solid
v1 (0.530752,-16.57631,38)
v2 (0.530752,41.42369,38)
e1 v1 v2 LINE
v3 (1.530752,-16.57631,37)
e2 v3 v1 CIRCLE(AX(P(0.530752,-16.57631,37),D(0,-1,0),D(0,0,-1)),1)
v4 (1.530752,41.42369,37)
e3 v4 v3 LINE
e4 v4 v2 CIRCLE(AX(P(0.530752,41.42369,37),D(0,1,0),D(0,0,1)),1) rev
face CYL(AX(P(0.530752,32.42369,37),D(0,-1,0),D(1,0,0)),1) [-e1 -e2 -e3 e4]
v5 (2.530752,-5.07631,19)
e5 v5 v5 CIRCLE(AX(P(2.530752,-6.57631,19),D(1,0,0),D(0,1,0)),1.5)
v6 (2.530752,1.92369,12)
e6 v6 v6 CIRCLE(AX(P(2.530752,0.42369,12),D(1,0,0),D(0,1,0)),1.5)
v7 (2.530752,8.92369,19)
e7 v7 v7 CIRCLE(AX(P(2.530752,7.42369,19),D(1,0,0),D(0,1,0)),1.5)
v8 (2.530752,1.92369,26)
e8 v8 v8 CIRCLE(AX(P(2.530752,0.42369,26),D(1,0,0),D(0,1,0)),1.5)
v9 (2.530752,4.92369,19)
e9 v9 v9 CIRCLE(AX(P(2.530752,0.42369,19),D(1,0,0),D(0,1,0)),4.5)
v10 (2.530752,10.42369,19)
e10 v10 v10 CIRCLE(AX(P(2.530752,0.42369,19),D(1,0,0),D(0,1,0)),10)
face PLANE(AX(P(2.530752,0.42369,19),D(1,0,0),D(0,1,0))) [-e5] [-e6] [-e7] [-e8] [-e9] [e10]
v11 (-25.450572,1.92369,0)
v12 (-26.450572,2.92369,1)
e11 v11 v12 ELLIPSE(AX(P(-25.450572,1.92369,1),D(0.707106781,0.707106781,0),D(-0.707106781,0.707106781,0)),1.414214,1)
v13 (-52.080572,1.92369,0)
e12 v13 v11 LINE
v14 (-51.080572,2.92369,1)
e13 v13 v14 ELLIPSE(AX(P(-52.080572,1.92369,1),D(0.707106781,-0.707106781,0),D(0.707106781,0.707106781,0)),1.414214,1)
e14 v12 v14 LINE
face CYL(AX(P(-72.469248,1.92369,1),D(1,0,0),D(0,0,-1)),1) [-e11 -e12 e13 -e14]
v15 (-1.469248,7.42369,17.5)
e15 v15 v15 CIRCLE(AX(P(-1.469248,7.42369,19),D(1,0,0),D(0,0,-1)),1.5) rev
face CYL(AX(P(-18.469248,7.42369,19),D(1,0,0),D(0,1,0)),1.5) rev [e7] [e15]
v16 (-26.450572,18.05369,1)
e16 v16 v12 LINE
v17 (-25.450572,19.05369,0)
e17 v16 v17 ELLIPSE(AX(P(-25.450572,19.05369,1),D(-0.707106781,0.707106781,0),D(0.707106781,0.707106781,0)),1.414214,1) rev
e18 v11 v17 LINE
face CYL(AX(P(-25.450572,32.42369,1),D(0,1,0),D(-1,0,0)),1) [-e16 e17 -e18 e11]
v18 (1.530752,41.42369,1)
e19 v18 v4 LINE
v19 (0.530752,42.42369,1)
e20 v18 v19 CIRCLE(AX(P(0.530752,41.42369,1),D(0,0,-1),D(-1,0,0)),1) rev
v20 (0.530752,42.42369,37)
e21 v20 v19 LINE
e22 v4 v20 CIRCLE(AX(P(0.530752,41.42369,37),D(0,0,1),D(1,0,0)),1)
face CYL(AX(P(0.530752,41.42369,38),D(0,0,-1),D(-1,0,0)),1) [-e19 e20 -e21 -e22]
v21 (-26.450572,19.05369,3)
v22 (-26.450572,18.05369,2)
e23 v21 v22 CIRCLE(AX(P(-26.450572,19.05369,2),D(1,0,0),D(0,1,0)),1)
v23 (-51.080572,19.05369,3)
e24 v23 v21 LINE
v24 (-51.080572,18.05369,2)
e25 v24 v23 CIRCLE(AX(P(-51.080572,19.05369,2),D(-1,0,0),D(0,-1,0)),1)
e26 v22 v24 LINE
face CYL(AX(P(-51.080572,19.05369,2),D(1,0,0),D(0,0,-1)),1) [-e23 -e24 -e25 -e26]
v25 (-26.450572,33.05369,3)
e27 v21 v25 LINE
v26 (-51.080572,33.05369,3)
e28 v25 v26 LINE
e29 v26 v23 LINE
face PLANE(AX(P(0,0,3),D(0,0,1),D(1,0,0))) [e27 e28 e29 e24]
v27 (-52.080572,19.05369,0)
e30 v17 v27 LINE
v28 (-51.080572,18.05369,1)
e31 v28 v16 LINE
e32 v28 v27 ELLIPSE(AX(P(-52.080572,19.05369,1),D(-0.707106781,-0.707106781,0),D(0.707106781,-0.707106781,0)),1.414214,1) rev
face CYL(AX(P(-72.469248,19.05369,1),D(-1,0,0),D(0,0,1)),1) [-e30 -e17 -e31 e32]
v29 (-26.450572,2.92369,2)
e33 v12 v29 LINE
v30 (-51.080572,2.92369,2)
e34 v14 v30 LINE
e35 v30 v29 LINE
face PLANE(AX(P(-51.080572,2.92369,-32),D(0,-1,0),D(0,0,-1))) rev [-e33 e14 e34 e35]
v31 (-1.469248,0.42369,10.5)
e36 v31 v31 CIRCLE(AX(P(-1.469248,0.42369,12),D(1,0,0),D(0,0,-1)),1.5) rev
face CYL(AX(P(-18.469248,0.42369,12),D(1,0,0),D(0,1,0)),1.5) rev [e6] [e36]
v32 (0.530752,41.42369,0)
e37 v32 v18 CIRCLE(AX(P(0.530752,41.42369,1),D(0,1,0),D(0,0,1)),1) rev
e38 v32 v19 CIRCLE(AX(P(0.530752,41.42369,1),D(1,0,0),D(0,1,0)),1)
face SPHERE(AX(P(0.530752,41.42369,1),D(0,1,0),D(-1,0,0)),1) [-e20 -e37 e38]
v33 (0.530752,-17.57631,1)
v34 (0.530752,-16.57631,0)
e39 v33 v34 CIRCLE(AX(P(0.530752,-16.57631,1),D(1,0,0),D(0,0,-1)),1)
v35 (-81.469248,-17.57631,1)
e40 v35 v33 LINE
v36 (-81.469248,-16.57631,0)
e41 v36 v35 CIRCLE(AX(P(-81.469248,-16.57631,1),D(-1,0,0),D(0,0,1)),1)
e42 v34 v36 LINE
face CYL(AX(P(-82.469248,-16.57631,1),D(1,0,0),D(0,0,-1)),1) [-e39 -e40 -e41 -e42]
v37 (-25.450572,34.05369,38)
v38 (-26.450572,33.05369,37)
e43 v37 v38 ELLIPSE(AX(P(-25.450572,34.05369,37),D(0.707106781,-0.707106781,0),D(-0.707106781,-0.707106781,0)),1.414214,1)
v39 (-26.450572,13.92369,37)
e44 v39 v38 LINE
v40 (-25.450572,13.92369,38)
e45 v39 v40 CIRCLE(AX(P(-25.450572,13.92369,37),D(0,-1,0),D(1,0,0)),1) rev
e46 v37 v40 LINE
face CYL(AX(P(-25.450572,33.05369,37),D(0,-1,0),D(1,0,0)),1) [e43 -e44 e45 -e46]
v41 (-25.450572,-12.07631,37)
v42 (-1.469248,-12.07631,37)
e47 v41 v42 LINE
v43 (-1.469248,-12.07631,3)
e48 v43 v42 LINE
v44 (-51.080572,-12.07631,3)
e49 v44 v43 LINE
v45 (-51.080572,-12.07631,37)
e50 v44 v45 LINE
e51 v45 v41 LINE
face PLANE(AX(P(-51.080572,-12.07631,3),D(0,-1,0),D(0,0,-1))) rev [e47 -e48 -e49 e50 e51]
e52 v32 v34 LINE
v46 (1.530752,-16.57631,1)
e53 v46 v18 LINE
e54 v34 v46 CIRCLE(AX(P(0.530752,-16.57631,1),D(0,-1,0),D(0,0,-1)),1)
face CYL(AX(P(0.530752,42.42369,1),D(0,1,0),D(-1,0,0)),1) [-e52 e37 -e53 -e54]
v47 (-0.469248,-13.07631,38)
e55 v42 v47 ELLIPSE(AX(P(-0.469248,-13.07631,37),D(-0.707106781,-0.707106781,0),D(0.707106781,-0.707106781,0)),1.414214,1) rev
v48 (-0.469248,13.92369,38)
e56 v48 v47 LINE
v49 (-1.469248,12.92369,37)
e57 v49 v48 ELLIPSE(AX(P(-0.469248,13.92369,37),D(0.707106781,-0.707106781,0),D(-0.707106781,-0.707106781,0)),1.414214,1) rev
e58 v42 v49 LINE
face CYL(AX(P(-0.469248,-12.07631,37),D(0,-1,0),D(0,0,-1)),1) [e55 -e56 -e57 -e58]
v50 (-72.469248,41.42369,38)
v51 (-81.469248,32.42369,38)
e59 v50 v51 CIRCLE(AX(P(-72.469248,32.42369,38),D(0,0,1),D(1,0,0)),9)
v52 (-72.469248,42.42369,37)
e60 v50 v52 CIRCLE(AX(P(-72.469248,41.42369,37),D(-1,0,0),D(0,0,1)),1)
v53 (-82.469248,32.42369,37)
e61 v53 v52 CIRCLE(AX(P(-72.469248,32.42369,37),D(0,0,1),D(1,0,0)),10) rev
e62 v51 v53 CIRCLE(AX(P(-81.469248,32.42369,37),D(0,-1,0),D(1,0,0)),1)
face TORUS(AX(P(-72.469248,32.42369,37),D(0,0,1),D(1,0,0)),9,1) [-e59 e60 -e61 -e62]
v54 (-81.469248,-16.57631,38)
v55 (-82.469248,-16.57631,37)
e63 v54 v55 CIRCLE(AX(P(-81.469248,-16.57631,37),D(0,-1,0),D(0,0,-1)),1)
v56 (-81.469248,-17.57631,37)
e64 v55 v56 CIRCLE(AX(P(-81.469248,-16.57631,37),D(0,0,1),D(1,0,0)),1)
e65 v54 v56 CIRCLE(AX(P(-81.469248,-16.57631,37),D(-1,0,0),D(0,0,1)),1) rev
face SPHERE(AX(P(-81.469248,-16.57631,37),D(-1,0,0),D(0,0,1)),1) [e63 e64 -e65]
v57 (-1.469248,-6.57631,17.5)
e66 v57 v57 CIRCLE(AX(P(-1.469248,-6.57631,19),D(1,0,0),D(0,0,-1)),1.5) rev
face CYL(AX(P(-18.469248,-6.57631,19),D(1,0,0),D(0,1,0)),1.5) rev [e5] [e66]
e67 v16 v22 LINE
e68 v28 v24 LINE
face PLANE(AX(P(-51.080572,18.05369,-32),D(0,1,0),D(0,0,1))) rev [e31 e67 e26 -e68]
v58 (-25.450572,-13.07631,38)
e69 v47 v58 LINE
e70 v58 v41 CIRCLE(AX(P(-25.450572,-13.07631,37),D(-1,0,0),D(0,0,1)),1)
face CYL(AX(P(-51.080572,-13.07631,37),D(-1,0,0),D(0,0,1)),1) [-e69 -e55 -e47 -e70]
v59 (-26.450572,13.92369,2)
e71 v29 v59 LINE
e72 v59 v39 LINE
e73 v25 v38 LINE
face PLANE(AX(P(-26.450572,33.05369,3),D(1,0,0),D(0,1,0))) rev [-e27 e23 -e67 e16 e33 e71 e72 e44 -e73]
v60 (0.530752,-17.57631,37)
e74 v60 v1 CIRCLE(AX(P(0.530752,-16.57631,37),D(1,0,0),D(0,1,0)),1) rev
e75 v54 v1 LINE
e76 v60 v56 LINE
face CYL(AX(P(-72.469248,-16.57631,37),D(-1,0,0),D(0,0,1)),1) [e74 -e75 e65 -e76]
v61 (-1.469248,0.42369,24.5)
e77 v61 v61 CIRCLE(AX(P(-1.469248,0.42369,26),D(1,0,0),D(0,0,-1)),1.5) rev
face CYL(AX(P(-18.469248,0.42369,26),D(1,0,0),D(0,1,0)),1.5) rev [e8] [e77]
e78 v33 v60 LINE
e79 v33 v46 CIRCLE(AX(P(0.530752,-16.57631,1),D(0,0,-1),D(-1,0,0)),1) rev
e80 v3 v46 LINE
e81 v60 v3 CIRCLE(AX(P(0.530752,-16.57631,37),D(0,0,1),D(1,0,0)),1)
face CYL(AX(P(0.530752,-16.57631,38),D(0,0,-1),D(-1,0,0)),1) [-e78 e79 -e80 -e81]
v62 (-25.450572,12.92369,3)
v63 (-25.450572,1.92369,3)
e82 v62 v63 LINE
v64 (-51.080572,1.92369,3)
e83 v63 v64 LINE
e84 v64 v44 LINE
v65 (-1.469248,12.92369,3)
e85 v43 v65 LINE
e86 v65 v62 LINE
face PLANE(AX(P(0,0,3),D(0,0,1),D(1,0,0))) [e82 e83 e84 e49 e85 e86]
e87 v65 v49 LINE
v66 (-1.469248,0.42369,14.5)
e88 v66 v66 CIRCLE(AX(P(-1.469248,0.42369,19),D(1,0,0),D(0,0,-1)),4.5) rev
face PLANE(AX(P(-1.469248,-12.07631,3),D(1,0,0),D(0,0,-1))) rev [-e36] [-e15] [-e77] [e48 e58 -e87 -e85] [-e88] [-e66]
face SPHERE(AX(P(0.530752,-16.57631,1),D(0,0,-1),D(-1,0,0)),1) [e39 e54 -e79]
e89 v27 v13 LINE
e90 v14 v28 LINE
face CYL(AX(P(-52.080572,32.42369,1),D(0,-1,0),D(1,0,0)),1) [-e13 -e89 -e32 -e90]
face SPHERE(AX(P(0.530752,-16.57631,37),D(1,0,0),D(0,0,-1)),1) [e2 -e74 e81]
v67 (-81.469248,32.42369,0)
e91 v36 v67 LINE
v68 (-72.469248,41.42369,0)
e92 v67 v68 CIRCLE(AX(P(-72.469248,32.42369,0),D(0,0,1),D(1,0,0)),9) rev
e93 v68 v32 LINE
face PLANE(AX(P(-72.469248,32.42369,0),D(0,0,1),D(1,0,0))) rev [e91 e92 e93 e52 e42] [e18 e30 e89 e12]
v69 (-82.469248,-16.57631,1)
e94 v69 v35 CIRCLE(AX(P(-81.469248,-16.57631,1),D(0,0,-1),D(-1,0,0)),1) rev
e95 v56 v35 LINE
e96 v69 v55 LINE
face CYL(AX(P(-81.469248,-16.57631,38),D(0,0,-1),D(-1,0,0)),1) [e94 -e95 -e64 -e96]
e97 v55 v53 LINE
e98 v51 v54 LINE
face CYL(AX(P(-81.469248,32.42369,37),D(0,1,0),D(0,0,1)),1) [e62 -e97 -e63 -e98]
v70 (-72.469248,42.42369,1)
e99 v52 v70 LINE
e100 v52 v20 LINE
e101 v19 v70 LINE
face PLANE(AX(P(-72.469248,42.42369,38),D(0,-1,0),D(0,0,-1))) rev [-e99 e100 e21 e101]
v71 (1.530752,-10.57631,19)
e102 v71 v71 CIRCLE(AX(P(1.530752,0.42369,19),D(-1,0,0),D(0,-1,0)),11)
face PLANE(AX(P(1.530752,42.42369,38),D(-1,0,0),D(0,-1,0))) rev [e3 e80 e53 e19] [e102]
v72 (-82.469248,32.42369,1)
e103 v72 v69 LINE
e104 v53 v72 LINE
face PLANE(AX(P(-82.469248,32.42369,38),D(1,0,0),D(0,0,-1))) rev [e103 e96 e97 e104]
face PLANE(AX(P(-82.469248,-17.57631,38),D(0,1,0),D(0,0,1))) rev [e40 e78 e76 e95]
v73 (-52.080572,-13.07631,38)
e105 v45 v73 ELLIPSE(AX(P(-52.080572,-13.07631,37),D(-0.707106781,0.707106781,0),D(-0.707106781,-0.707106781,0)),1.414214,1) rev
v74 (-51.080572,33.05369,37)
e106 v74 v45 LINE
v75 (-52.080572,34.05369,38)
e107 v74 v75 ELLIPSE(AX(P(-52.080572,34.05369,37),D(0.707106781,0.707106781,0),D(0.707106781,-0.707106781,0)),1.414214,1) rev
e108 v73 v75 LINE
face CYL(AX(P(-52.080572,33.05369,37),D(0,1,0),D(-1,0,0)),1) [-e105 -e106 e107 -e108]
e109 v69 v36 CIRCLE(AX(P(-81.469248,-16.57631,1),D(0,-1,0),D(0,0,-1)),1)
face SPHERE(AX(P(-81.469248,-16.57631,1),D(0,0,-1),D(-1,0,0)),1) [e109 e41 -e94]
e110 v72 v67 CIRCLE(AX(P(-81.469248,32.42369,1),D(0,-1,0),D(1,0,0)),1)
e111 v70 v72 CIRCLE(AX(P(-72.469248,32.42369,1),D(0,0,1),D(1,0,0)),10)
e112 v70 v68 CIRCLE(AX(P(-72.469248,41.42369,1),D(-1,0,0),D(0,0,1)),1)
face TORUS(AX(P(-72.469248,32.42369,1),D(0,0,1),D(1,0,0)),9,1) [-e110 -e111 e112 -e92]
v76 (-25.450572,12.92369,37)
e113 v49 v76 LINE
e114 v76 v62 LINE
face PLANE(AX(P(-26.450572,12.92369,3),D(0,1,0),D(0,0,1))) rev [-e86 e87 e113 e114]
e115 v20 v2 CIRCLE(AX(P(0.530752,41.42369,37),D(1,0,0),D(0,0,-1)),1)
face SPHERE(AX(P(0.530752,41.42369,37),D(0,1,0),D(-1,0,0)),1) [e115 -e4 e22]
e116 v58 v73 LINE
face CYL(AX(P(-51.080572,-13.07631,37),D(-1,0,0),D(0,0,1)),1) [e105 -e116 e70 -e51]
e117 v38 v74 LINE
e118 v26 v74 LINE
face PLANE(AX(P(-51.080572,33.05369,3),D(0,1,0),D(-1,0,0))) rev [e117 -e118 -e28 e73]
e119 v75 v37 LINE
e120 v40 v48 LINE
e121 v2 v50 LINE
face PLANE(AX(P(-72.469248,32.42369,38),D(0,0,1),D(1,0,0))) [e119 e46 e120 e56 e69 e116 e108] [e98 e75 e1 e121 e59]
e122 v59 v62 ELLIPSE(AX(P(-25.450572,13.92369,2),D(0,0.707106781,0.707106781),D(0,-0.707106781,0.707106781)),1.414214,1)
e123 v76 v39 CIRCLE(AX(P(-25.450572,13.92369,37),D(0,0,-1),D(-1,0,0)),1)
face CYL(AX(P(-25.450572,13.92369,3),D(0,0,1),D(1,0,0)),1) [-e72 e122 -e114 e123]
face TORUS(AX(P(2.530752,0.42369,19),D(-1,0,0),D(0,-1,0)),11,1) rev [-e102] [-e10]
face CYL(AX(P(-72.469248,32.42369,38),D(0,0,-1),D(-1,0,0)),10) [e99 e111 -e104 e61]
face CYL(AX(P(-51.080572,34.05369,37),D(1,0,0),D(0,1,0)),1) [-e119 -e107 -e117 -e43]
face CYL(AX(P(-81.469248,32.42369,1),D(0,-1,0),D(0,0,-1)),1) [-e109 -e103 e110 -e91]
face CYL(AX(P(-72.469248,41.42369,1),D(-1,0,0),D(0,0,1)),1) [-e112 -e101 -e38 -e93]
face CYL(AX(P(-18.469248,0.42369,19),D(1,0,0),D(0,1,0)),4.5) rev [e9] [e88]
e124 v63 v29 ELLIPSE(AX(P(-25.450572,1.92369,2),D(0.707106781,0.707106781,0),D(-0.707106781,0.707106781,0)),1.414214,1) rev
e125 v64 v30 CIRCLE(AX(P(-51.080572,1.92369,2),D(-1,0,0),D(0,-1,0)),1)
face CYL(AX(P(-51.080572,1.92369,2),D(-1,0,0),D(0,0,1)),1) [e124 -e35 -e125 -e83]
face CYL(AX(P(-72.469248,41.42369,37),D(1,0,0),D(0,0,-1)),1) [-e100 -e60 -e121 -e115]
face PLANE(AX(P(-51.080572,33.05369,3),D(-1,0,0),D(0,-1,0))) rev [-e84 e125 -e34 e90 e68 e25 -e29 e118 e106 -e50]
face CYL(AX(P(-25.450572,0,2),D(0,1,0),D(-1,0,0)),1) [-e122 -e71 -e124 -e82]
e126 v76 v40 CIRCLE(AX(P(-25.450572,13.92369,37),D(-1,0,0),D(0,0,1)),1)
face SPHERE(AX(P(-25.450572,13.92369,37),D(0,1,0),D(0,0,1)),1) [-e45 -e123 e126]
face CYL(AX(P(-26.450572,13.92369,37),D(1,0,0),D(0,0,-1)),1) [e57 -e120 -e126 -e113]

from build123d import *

# Parameters (mm, degrees)
BOSS_EXTRUDE1_DEPTH = 38
SKETCH2_W           = 24.63
SKETCH2_H           = 45.13
CUT_EXTRUDE1_DEPTH  = 35
SKETCH3_W           = 24.63
SKETCH3_H           = 15.13
CUT_EXTRUDE2_DEPTH  = 35
FILLET1_R           = 1
SKETCH4_R           = 10
BOSS_EXTRUDE2_DEPTH = 1
FILLET3_R           = 1
SKETCH5_R           = 1.5
SKETCH5_R_2         = 4.5
CUT_EXTRUDE3_DEPTH  = 21
SKETCH6_W           = 24.981324159
SKETCH6_H           = 25
CUT_EXTRUDE4_DEPTH  = 35
FILLET2_R           = 1
FILLET4_R           = 1


with BuildPart() as part:
    # Sketch1 → Boss-Extrude1 (new body)
    with BuildSketch(Plane.XY):
        with BuildLine():
            Line((-72.469248292, 42.423690205), (1.530751708, 42.423690205))
            Line((1.530751708, 42.423690205), (1.530751708, -17.576309795))
            Line((1.530751708, -17.576309795), (-82.469248292, -17.576309795))
            Line((-82.469248292, -17.576309795), (-82.469248292, 32.423690205))
            ThreePointArc((-82.469248292, 32.423690205), (-79.540316103, 39.494758017), (-72.469248292, 42.423690205))
        make_face()
    extrude(amount=BOSS_EXTRUDE1_DEPTH)

    # Sketch2 → Cut-Extrude1 (cut)
    with BuildSketch(Plane.XY.offset(38)):
        with Locations((-38.765572451, 10.488690205)):
            Rectangle(SKETCH2_W, SKETCH2_H)
    extrude(amount=-CUT_EXTRUDE1_DEPTH, mode=Mode.SUBTRACT)

    # Sketch3 → Cut-Extrude2 (cut)
    with BuildSketch(Plane.XY.offset(3)):
        with Locations((-38.765572451, 10.488690205)):
            Rectangle(SKETCH3_W, SKETCH3_H)
    extrude(amount=-CUT_EXTRUDE2_DEPTH, mode=Mode.SUBTRACT)

    # Fillet1
    fillet1_edges = [part.edges().sort_by_distance(p)[0] for p in [
        (-79.540316103, 39.494758017, 38),
        (-82.469248292, 7.423690205, 38),
        (-51.080572451, 10.488690205, 38),
        (-40.469248292, -17.576309795, 38),
        (-38.765572451, -12.076309795, 38),
        (-26.450572451, 10.488690205, 38),
        (-38.765572451, 33.053690205, 38),
        (-38.765572451, 2.923690205, 0),
        (-26.450572451, 10.488690205, 0),
        (-38.765572451, 18.053690205, 0),
        (-51.080572451, 10.488690205, 0),
        (1.530751708, 12.423690205, 38),
        (-40.469248292, -17.576309795, 0),
        (-82.469248292, 7.423690205, 0),
        (-79.540316103, 39.494758017, 0),
        (-35.469248292, 42.423690205, 0),
        (1.530751708, 12.423690205, 0),
        (-35.469248292, 42.423690205, 38),
        (1.530751708, -17.576309795, 19),
        (-82.469248292, -17.576309795, 19),
        (1.530751708, 42.423690205, 19),
    ]]
    fillet(fillet1_edges, radius=FILLET1_R)

    # Sketch4 → Boss-Extrude2 (add)
    with BuildSketch(Plane(origin=(1.530751708, 0, 0), x_dir=(0, 0, -1), z_dir=(1, 0, 0))):
        with Locations(Location((-19, 0.423690205, 0), (0, 0, 270))):
            Circle(SKETCH4_R)
    extrude(amount=BOSS_EXTRUDE2_DEPTH)

    # Fillet3
    fillet3_edges = [part.edges().sort_by_distance(p)[0] for p in [
        (1.530751708, 10.423690205, 19),
    ]]
    fillet(fillet3_edges, radius=FILLET3_R - 0.0001)  # a hair under: the kernel refuses the full size

    # Sketch5 → Cut-Extrude3 (cut)
    with BuildSketch(Plane(origin=(2.530751708, 0, 0), x_dir=(0, 0, -1), z_dir=(1, 0, 0))):
        with Locations(Location((-19, 7.423690205, 0), (0, 0, 90))):
            Circle(SKETCH5_R)
        with Locations(Location((-12, 0.423690205, 0), (0, 0, 90))):
            Circle(SKETCH5_R)
        with Locations(Location((-19, -6.576309795, 0), (0, 0, 90))):
            Circle(SKETCH5_R)
        with Locations(Location((-26, 0.423690205, 0), (0, 0, 90))):
            Circle(SKETCH5_R)
        with Locations(Location((-19, 0.423690205, 0), (0, 0, 90))):
            Circle(SKETCH5_R_2)
    extrude(amount=-CUT_EXTRUDE3_DEPTH, mode=Mode.SUBTRACT)

    # Sketch6 → Cut-Extrude4 (cut)
    with BuildSketch(Plane.XY.offset(38)):
        with Locations((-13.959910372, 0.423690205)):
            Rectangle(SKETCH6_W, SKETCH6_H)
    extrude(amount=-CUT_EXTRUDE4_DEPTH, mode=Mode.SUBTRACT)

    # Fillet2
    fillet2_edges = [part.edges().sort_by_distance(p)[0] for p in [
        (-38.765572451, 2.923690205, 3),
        (-38.765572451, 18.053690205, 3),
    ]]
    fillet(fillet2_edges, radius=FILLET2_R)

    # Fillet4
    fillet4_edges = [part.edges().sort_by_distance(p)[0] for p in [
        (-26.450572451, 12.923690205, 20),
        (-26.157679232, 12.923690205, 37.707106781),
        (-26.450572451, 7.423690205, 3),
        (-13.459910371, 12.923690205, 38),
        (-13.459910371, -12.076309795, 38),
        (-1.469248292, 0.423690205, 38),
    ]]
    fillet(fillet4_edges, radius=FILLET4_R - 0.0001)  # a hair under: the kernel refuses the full size


solid = part.part
